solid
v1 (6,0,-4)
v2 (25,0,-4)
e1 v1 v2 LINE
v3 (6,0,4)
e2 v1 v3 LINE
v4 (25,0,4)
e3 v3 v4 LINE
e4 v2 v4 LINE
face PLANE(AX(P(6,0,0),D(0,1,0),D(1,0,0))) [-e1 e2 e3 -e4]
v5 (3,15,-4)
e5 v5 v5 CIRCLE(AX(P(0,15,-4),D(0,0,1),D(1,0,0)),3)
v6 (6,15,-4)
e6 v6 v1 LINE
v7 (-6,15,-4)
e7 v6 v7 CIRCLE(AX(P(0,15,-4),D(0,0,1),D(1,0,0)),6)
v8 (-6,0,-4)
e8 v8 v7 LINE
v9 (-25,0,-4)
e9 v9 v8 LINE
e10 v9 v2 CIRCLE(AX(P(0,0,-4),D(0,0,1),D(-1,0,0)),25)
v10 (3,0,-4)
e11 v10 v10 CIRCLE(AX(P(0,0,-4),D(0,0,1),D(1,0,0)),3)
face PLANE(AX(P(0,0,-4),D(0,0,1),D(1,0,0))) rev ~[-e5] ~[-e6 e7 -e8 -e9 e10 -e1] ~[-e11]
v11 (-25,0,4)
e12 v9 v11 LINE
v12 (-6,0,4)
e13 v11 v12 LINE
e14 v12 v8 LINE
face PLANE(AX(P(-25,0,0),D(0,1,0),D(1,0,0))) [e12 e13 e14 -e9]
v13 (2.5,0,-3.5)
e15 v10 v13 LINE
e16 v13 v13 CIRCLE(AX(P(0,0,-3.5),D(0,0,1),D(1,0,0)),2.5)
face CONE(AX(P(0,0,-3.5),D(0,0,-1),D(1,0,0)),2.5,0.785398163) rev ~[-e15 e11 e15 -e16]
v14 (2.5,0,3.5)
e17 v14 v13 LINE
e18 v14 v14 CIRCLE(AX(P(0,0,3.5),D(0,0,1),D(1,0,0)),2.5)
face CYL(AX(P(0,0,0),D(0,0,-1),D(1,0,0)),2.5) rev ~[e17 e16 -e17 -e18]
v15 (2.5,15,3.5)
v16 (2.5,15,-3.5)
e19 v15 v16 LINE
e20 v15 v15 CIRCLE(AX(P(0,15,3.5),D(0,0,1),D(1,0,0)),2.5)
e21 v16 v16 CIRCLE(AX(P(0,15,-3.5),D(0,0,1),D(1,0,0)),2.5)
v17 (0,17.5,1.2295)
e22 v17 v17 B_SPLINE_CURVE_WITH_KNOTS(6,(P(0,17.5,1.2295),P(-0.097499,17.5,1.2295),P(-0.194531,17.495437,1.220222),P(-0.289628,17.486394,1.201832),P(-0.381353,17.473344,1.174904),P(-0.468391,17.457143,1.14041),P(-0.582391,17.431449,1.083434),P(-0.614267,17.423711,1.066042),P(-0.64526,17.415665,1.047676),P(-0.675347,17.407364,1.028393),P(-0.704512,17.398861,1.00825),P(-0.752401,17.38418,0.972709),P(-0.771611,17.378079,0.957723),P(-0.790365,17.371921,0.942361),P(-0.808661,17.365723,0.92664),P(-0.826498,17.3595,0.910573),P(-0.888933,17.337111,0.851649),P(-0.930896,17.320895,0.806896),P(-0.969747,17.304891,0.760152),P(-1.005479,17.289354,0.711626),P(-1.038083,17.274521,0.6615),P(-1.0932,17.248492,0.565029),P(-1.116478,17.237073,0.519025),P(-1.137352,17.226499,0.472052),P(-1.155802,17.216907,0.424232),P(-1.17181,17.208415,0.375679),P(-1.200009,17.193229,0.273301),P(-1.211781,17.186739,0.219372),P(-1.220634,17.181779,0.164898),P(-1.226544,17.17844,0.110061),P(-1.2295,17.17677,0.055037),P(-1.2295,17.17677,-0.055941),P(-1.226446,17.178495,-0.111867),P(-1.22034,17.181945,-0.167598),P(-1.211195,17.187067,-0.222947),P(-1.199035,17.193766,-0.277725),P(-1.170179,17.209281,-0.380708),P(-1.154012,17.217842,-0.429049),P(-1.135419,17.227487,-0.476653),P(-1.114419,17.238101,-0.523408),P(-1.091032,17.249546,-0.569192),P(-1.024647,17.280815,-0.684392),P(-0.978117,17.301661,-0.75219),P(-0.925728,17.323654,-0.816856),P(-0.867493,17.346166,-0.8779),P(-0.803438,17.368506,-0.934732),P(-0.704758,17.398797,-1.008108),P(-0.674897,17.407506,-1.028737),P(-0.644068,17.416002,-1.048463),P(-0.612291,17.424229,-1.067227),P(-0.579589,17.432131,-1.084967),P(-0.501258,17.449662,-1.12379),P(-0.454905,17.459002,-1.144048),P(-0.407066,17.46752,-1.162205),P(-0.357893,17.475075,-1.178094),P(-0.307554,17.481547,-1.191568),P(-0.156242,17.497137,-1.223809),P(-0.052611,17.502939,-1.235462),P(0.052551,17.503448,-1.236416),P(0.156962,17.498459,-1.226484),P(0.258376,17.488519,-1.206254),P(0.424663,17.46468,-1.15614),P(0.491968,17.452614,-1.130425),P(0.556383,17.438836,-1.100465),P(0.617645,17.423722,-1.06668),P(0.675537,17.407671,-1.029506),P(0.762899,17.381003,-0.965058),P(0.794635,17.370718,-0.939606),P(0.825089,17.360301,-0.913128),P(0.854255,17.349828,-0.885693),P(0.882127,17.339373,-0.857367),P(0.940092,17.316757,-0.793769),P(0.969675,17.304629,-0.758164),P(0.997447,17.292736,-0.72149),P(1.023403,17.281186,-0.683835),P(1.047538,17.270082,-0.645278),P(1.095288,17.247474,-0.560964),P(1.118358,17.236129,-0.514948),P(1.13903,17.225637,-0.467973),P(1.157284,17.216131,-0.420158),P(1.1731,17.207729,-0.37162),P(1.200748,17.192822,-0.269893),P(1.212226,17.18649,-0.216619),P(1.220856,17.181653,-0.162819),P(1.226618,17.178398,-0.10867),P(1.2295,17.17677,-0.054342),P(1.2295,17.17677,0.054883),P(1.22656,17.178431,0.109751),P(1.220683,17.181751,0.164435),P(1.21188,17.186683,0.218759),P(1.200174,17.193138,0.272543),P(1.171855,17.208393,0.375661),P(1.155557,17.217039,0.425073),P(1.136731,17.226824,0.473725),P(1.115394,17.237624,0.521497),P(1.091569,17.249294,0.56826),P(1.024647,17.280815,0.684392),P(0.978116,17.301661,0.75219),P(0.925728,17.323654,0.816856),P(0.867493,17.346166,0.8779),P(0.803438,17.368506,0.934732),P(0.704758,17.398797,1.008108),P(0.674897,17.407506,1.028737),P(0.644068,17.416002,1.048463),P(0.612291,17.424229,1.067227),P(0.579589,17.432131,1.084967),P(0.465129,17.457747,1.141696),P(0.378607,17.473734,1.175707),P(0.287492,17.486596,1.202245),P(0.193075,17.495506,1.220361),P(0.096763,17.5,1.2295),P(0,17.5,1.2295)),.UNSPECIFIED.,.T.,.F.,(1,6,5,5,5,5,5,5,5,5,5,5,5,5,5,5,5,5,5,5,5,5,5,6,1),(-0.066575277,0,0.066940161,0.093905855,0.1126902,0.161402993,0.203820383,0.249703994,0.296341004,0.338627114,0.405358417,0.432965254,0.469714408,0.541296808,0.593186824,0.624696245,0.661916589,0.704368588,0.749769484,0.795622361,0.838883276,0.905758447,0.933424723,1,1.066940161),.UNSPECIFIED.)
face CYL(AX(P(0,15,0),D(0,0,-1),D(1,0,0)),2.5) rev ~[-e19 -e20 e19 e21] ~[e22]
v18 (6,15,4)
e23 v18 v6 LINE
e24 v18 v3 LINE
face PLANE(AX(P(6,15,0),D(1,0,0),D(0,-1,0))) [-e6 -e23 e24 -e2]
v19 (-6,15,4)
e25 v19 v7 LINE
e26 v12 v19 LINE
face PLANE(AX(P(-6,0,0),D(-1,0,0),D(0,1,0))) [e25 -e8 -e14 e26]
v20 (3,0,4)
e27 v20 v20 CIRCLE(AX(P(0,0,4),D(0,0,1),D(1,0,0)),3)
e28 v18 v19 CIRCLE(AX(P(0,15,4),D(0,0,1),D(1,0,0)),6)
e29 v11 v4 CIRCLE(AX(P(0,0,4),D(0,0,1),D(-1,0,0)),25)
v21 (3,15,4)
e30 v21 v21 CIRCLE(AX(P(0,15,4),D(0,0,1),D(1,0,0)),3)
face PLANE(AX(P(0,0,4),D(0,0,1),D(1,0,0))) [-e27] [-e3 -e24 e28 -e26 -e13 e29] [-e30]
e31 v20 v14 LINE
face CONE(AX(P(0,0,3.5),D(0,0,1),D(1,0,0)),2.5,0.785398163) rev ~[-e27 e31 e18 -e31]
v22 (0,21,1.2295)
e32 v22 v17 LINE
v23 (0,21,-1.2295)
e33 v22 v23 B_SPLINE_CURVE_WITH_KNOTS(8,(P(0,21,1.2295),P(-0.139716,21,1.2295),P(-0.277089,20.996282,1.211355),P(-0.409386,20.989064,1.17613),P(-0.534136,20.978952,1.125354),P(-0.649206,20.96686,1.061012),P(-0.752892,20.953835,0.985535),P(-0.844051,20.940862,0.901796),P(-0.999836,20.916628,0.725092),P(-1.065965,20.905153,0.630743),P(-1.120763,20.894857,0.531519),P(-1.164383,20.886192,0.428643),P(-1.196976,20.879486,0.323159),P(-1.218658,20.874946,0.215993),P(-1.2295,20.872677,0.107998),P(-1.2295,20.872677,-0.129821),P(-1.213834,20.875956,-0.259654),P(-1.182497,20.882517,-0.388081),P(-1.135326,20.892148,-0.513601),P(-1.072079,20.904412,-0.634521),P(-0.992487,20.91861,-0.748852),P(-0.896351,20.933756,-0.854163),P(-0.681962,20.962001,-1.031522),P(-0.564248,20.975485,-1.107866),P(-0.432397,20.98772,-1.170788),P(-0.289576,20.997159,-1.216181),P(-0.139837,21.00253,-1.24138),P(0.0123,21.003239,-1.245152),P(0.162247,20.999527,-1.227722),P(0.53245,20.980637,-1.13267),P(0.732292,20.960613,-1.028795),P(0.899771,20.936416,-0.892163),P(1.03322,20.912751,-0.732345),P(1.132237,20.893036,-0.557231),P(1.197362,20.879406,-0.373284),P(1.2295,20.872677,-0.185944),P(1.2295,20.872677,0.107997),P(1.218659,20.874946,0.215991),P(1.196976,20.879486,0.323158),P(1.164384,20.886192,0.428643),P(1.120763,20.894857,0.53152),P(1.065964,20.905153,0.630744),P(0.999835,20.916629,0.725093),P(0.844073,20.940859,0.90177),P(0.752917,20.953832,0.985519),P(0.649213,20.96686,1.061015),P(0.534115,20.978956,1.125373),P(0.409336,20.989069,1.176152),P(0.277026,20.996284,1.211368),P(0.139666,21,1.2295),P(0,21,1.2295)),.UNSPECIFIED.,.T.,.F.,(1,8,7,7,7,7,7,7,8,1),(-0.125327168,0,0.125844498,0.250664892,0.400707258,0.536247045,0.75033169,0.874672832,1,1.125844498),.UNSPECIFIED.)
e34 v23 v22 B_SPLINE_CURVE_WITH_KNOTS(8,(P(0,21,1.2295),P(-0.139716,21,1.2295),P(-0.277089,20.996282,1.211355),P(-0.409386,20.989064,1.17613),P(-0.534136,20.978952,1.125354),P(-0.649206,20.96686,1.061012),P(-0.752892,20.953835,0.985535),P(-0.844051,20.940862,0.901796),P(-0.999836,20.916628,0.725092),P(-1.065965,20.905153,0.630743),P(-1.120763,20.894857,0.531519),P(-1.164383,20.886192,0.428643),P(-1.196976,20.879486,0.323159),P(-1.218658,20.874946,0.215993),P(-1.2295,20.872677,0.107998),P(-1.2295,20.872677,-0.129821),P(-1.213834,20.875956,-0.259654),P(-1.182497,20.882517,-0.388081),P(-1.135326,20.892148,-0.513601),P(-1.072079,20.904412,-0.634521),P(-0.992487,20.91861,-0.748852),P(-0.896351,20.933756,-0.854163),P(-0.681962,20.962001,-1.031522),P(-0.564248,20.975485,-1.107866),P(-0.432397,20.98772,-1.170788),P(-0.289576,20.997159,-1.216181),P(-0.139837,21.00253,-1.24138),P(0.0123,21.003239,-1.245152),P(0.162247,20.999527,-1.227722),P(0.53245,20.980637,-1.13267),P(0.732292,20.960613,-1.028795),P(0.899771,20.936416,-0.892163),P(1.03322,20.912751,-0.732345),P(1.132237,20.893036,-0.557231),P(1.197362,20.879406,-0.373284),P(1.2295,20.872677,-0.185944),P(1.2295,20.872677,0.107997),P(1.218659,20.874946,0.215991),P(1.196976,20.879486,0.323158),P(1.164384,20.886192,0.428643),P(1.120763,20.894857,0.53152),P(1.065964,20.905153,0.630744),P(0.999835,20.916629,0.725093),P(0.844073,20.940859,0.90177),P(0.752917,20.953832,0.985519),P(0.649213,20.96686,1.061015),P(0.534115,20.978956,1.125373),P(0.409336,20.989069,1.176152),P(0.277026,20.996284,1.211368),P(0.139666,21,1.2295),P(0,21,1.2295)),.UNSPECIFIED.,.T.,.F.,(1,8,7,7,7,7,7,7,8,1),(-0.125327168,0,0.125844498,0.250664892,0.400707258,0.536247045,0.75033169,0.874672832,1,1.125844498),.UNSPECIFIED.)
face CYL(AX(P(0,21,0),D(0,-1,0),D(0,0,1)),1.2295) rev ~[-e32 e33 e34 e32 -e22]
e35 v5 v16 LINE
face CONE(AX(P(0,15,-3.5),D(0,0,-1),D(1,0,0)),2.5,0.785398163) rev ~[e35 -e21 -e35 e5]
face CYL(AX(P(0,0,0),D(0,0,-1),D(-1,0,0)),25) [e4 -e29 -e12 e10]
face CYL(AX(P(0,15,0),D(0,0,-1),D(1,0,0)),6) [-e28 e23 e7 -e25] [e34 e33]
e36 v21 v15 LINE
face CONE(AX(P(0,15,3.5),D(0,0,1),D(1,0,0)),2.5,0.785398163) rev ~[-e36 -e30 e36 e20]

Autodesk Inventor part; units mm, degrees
ref_plane "YZ Plane" through (0, 0, 0) normal (1, 0, 0) x (0, 1, 0)
ref_plane "XZ Plane" through (0, 0, 0) normal (0, 1, 0) x (-1, 0, 0)
ref_plane "XY Plane" through (0, 0, 0) normal (0, 0, 1) x (1, 0, 0)
sketch "Sketch1" plane through (0, 0, 0) normal (0, 0, 1) x (1, 0, 0)
  arc A0 (-25, 0) -> (25, 0) centre (0, 0) ccw
  circle A1 centre (0, 0) radius 2.5
  circle A2 centre (0, 15) radius 2.5
  line L0 (-25, 0) -> (-6, 0)
  line L1 (-6, 0) -> (-6, 15)
  arc A3 (6, 15) -> (-6, 15) centre (0, 15) ccw
  line L2 (6, 15) -> (6, 0)
  line L3 (6, 0) -> (25, 0)
  point P0 (0, 21)
  dimension "d0" = 50
  dimension "d1" = 5
  dimension "d2" = 15
  dimension "d4" = 12
extrude "Extrusion1" add sketch "Sketch1" along normal mid plane 8
hole "Hole1" at (0, 21, 0) direction (0, -1, 0) diameter 2.459 end up to surface thread size "M3x0.5" class "6H" standard "ISO Metric profile"
chamfer "Chamfer1" distance 0.5 angle 45 4 edges at (-2.5, 15, 4) (-2.5, 0, 4) (-2.5, 0, -4) (-2.5, 15, -4)
properties part number "Counterweight"
